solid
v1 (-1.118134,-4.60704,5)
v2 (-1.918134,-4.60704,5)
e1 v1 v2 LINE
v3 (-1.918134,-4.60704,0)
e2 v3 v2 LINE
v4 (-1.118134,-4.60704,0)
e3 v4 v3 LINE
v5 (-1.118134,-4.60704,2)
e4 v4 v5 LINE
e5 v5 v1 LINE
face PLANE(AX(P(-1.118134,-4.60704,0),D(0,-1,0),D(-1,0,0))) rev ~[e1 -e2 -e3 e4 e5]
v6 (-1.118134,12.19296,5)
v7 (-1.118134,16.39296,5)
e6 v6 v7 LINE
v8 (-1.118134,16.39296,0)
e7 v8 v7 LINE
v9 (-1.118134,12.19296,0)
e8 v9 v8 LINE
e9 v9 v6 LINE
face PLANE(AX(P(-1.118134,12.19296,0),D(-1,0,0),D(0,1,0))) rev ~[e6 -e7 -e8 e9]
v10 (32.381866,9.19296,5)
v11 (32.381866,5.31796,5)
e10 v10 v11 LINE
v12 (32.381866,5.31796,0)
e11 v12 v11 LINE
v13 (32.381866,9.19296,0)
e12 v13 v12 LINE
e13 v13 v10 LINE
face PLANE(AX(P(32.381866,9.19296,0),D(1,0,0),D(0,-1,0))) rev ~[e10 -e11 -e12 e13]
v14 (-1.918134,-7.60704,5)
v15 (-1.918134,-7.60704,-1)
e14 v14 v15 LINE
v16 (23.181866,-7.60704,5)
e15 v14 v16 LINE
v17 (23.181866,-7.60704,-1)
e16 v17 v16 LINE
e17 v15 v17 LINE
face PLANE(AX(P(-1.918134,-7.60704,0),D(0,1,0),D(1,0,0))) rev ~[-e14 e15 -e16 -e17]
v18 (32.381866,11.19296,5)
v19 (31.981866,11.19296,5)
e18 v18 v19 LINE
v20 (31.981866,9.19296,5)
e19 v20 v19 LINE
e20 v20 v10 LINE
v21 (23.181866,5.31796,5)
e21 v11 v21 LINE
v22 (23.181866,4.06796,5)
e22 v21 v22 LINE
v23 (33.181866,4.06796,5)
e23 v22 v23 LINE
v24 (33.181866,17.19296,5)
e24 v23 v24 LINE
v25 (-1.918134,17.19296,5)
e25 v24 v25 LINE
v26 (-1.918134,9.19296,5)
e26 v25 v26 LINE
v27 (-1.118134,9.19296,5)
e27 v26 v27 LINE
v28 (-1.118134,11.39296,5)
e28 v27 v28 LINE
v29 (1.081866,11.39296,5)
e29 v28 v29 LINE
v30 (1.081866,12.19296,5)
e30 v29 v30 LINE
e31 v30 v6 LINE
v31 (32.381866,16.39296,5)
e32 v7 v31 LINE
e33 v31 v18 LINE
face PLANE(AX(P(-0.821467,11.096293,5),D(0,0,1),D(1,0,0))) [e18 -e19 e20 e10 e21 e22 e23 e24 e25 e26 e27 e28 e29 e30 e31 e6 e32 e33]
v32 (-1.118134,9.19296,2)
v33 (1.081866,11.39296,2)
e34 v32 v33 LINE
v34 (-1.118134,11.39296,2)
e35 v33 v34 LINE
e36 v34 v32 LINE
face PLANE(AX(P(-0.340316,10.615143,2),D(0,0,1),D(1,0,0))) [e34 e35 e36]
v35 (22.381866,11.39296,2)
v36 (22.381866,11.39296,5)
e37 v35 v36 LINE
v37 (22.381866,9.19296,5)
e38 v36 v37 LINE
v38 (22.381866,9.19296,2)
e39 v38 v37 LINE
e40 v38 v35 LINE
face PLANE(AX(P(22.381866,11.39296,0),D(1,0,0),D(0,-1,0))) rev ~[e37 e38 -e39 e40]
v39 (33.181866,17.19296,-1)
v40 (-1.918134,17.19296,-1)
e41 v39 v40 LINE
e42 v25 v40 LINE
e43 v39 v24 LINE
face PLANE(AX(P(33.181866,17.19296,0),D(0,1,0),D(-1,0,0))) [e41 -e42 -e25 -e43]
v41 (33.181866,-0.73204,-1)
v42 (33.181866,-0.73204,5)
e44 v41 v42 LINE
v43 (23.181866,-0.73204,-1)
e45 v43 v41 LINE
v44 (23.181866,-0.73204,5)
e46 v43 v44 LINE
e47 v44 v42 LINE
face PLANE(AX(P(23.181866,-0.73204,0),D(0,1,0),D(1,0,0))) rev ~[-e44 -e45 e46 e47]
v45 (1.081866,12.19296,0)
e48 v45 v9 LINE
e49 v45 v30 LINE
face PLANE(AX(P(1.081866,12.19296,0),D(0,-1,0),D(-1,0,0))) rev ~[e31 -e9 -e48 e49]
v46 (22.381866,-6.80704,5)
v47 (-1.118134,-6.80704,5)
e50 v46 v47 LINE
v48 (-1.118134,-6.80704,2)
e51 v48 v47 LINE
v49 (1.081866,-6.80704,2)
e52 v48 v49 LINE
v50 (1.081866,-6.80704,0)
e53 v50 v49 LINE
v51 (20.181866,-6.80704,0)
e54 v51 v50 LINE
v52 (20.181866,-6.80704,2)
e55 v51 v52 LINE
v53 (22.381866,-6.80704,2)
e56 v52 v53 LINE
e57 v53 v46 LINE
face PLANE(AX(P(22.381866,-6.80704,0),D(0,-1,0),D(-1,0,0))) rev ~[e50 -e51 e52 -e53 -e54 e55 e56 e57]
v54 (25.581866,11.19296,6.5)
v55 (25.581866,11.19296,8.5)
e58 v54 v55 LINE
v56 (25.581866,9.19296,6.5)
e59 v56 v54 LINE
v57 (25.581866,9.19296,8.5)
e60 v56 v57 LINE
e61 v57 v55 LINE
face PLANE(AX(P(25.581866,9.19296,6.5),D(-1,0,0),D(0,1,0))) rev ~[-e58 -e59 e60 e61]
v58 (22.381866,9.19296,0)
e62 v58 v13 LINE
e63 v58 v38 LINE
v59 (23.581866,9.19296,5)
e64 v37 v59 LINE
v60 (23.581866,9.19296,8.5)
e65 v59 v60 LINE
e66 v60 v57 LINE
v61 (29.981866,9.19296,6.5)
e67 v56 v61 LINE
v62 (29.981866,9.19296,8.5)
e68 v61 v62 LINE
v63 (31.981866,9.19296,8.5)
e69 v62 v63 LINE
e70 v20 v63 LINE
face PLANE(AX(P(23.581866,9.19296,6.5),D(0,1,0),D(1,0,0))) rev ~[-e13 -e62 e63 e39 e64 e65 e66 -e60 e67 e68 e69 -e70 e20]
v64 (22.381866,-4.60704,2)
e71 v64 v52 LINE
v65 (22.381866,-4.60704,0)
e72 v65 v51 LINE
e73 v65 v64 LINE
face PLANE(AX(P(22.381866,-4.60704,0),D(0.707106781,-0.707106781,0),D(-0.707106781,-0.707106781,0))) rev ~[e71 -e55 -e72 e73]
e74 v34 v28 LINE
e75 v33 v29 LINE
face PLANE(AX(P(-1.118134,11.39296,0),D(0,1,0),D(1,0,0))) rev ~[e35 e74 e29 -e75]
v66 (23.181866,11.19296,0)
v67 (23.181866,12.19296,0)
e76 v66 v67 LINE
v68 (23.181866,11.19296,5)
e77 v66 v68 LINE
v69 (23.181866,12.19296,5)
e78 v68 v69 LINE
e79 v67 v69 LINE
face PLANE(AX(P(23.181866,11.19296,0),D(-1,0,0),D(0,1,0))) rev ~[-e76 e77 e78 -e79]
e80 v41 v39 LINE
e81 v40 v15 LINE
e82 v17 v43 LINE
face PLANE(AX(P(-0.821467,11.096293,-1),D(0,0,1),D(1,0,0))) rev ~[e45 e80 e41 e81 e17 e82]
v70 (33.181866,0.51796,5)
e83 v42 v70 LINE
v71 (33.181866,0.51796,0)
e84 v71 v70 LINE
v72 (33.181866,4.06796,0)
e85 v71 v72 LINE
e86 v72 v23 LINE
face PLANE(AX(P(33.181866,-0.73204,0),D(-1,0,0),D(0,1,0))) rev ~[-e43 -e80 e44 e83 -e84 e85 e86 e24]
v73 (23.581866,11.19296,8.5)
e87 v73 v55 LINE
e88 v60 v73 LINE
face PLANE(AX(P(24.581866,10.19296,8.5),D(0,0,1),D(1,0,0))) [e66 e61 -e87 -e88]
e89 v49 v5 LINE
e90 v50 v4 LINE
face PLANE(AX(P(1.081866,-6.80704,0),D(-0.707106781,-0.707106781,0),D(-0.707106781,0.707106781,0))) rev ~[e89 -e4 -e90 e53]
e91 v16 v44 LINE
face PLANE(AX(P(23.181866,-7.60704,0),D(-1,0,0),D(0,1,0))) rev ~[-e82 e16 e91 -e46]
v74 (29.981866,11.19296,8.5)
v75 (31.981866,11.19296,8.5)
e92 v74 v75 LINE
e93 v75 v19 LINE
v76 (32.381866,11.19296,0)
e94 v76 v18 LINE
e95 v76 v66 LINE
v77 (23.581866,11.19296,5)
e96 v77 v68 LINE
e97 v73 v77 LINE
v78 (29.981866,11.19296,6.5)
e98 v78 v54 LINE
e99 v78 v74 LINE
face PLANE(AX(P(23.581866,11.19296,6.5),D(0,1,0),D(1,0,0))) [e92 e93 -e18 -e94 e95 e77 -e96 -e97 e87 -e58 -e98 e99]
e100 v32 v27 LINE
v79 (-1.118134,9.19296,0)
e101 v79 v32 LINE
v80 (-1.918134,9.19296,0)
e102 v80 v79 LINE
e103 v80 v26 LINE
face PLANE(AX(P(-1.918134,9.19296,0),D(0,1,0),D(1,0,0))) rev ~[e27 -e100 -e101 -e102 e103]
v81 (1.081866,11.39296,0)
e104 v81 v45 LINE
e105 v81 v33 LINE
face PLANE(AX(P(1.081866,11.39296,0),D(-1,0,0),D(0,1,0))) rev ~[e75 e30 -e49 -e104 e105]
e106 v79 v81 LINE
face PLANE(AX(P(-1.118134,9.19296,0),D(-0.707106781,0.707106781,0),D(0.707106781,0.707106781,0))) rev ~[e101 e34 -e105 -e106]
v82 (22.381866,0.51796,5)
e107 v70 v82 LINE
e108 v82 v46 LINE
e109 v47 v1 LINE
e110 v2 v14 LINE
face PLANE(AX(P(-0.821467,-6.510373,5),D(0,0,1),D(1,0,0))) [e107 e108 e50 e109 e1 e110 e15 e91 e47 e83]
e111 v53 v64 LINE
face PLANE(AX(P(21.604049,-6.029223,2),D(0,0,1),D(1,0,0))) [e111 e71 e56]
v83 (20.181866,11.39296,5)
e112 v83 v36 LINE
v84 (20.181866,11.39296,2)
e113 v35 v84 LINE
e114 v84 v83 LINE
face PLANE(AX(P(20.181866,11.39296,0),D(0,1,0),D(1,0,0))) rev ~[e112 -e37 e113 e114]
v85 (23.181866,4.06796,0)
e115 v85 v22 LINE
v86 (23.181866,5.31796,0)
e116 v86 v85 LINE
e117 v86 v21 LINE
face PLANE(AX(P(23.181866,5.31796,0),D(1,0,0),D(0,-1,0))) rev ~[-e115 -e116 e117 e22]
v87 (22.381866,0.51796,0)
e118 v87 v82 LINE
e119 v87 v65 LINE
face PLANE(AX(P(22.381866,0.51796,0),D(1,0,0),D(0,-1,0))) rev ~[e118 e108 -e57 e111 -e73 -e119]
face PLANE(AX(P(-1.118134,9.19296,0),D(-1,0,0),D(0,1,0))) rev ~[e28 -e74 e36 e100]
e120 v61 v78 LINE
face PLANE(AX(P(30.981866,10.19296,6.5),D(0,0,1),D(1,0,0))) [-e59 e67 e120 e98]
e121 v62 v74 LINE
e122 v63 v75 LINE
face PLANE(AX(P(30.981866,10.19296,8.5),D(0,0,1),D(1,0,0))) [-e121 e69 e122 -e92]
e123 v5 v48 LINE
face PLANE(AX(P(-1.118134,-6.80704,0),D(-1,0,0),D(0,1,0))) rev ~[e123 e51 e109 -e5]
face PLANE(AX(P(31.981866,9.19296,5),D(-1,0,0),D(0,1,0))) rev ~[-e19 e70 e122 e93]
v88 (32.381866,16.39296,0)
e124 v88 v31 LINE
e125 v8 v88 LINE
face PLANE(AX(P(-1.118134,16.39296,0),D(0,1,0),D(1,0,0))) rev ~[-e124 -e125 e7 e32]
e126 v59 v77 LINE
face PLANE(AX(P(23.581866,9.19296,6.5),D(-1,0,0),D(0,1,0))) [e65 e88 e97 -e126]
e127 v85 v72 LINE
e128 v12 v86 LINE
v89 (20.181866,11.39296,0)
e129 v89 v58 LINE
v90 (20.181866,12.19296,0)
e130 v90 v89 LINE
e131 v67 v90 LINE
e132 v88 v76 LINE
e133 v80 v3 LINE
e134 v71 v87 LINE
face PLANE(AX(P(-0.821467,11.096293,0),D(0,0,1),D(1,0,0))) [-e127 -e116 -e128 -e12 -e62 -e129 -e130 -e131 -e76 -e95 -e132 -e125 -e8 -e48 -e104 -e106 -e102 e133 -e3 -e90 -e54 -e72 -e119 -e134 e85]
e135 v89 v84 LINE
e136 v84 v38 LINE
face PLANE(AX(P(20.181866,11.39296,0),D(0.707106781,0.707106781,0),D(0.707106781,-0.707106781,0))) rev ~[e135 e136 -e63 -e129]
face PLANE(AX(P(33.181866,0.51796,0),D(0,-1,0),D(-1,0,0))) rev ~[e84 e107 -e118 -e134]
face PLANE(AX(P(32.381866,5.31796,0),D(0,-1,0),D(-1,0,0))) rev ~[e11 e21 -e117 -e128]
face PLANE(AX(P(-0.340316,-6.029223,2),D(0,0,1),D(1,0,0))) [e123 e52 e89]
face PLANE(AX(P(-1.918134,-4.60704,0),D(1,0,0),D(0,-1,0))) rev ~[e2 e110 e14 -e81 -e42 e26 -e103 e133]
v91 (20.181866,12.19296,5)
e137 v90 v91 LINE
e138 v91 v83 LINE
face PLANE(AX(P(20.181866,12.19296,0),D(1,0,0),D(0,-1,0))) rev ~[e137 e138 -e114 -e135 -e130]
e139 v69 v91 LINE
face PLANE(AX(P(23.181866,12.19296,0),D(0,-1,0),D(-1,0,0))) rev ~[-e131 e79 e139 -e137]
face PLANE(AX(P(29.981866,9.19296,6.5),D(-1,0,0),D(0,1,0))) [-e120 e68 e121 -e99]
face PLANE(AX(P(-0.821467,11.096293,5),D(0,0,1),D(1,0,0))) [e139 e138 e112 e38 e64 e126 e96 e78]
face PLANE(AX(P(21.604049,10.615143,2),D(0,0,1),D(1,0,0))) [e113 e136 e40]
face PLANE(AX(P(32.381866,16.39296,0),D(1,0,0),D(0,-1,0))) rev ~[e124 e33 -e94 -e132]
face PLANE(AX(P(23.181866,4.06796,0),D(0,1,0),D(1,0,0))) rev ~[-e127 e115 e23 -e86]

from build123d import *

# Parameters (mm, degrees)
F0_W     = 19.1
F0_H     = 0.8
F0_W_2   = 0.8
F0_H_2   = 13.8
F0_W_3   = 2.45
F0_H_3   = 1
F0_H_4   = 2
F0_W_4   = 4.3
F0_H_5   = 3.875
F0_W_5   = 9.2
F0_H_6   = 3.55
F0_H_7   = 1.25
F1_DEPTH = 1
F2_DEPTH = 2
F3_DEPTH = 5
F4_W     = 2
F4_H     = 2
F4_W_2   = 4.4
F5_DEPTH = 1.5
F6_W     = 2
F6_H     = 2
F7_DEPTH = 2


# Not quite as in the source:
# - a feature names something its author has since deleted; it is built from what else it names


with BuildPart() as f1:
    # F0 (on Top) → F1 (new body)
    with BuildSketch(Plane.XY):
        Polygon((-1.9181339439, 9.1929600332), (-1.1181339439, 9.1929600332), (-1.1181339439, 11.3929600332), (1.0818660561, 11.3929600332), (1.0818660561, 12.1929600332), (-1.1181339439, 12.1929600332), (-1.9181339439, 12.1929600332), align=None)
        Polygon((-1.1181339439, 11.3929600332), (-1.1181339439, 9.1929600332), (1.0818660561, 11.3929600332), align=None)
        with Locations((10.6318660561, 11.7929600332)):
            Rectangle(F0_W, F0_H)
        Polygon((1.0818660561, -6.8070399668), (20.1818660561, -6.8070399668), (22.3818660561, -4.6070399668), (22.3818660561, 0.5179600332), (22.3818660561, 9.1929600332), (20.1818660561, 11.3929600332), (1.0818660561, 11.3929600332), (-1.1181339439, 9.1929600332), (-1.1181339439, -4.6070399668), align=None)
        with Locations((-1.5181339439, 2.2929600332)):
            Rectangle(F0_W_2, F0_H_2)
        Polygon((-1.9181339439, -7.6070399668), (1.0818660561, -7.6070399668), (1.0818660561, -6.8070399668), (-1.1181339439, -6.8070399668), (-1.1181339439, -4.6070399668), (-1.9181339439, -4.6070399668), (-1.9181339439, -6.8070399668), align=None)
        Polygon((-1.1181339439, -6.8070399668), (1.0818660561, -6.8070399668), (-1.1181339439, -4.6070399668), align=None)
        with Locations((10.6318660561, -7.2070399668)):
            Rectangle(F0_W, F0_H)
        Polygon((20.1818660561, -7.6070399668), (23.1818660561, -7.6070399668), (23.1818660561, -4.6070399668), (22.3818660561, -4.6070399668), (22.3818660561, -6.8070399668), (20.1818660561, -6.8070399668), align=None)
        Polygon((22.3818660561, -4.6070399668), (20.1818660561, -6.8070399668), (22.3818660561, -6.8070399668), align=None)
        Polygon((22.3818660561, 0.5179600332), (23.1818660561, 0.5179600332), (23.1818660561, 4.0679600332), (23.1818660561, 5.3179600332), (23.1818660561, 9.1929600332), (22.3818660561, 9.1929600332), align=None)
        Polygon((20.1818660561, 11.3929600332), (22.3818660561, 9.1929600332), (22.3818660561, 11.3929600332), align=None)
        Polygon((22.3818660561, 11.3929600332), (22.3818660561, 9.1929600332), (23.1818660561, 9.1929600332), (23.1818660561, 11.1929600332), (23.1818660561, 12.1929600332), (20.1818660561, 12.1929600332), (20.1818660561, 11.3929600332), align=None)
        with Locations((24.4068660561, 11.6929600332)):
            Rectangle(F0_W_3, F0_H_3)
        with Locations((24.4068660561, 10.1929600332)):
            Rectangle(F0_W_3, F0_H_4)
        with Locations((27.7818660561, 10.1929600332)):
            Rectangle(F0_W_4, F0_H_4)
        with Locations((27.7818660561, 11.6929600332)):
            Rectangle(F0_W_4, F0_H_3)
        with Locations((31.1568660561, 7.2554600332)):
            Rectangle(F0_W_3, F0_H_5)
        Polygon((32.3818660561, 9.1929600332), (32.3818660561, 5.3179600332), (33.1818660561, 5.3179600332), (33.1818660561, 12.1929600332), (32.3818660561, 12.1929600332), (32.3818660561, 11.1929600332), align=None)
        with Locations((27.7818660561, 7.2554600332)):
            Rectangle(F0_W_4, F0_H_5)
        with Locations((24.4068660561, 7.2554600332)):
            Rectangle(F0_W_3, F0_H_5)
        Polygon((23.1818660561, 5.3179600332), (23.1818660561, 4.0679600332), (32.3818660561, 4.0679600332), (32.3818660561, 5.3179600332), (29.9318660561, 5.3179600332), (25.6318660561, 5.3179600332), align=None)
        with Locations((27.7818660561, 2.2929600332)):
            Rectangle(F0_W_5, F0_H_6)
        with Locations((27.7818660561, -0.1070399668)):
            Rectangle(F0_W_5, F0_H_7)
        with Locations((32.7818660561, -0.1070399668)):
            Rectangle(F0_W_2, F0_H_7)
        with Locations((32.7818660561, 2.2929600332)):
            Rectangle(F0_W_2, F0_H_6)
        with Locations((32.7818660561, 4.6929600332)):
            Rectangle(F0_W_2, F0_H_7)
        Polygon((-1.9181339439, 17.1929600332), (-1.9181339439, 12.1929600332), (-1.1181339439, 12.1929600332), (-1.1181339439, 16.3929600332), (23.1818660561, 16.3929600332), (25.6318660561, 16.3929600332), (29.9318660561, 16.3929600332), (32.3818660561, 16.3929600332), (32.3818660561, 12.1929600332), (33.1818660561, 12.1929600332), (33.1818660561, 17.1929600332), (29.9318660561, 17.1929600332), (25.6318660561, 17.1929600332), (23.1818660561, 17.1929600332), align=None)
        Polygon((1.0818660561, 12.1929600332), (20.1818660561, 12.1929600332), (23.1818660561, 12.1929600332), (25.6318660561, 12.1929600332), (29.9318660561, 12.1929600332), (32.3818660561, 12.1929600332), (32.3818660561, 16.3929600332), (29.9318660561, 16.3929600332), (25.6318660561, 16.3929600332), (23.1818660561, 16.3929600332), (-1.1181339439, 16.3929600332), (-1.1181339439, 12.1929600332), align=None)
        Polygon((22.3818660561, -4.6070399668), (23.1818660561, -4.6070399668), (23.1818660561, -0.7320399668), (23.1818660561, 0.5179600332), (22.3818660561, 0.5179600332), align=None)
        with Locations((31.1568660561, 10.1929600332)):
            Rectangle(F0_W_3, F0_H_4)
        with Locations((31.1568660561, 11.6929600332)):
            Rectangle(F0_W_3, F0_H_3)
    extrude(amount=-F1_DEPTH)

    # F0 (on Top) → F2 (join)
    with BuildSketch(Plane.XY):
        Polygon((-1.1181339439, -6.8070399668), (1.0818660561, -6.8070399668), (-1.1181339439, -4.6070399668), align=None)
        Polygon((22.3818660561, -4.6070399668), (20.1818660561, -6.8070399668), (22.3818660561, -6.8070399668), align=None)
        Polygon((20.1818660561, 11.3929600332), (22.3818660561, 9.1929600332), (22.3818660561, 11.3929600332), align=None)
        Polygon((-1.1181339439, 11.3929600332), (-1.1181339439, 9.1929600332), (1.0818660561, 11.3929600332), align=None)
    extrude(amount=F2_DEPTH)

    # F0 (on Top) → F3 (join)
    with BuildSketch(Plane.XY):
        Polygon((-1.9181339439, -7.6070399668), (1.0818660561, -7.6070399668), (1.0818660561, -6.8070399668), (-1.1181339439, -6.8070399668), (-1.1181339439, -4.6070399668), (-1.9181339439, -4.6070399668), (-1.9181339439, -6.8070399668), align=None)
        Polygon((-1.9181339439, 9.1929600332), (-1.1181339439, 9.1929600332), (-1.1181339439, 11.3929600332), (1.0818660561, 11.3929600332), (1.0818660561, 12.1929600332), (-1.1181339439, 12.1929600332), (-1.9181339439, 12.1929600332), align=None)
        Polygon((20.1818660561, -7.6070399668), (23.1818660561, -7.6070399668), (23.1818660561, -4.6070399668), (22.3818660561, -4.6070399668), (22.3818660561, -6.8070399668), (20.1818660561, -6.8070399668), align=None)
        Polygon((22.3818660561, 11.3929600332), (22.3818660561, 9.1929600332), (23.1818660561, 9.1929600332), (23.1818660561, 11.1929600332), (23.1818660561, 12.1929600332), (20.1818660561, 12.1929600332), (20.1818660561, 11.3929600332), align=None)
        Polygon((-1.9181339439, 17.1929600332), (-1.9181339439, 12.1929600332), (-1.1181339439, 12.1929600332), (-1.1181339439, 16.3929600332), (23.1818660561, 16.3929600332), (25.6318660561, 16.3929600332), (29.9318660561, 16.3929600332), (32.3818660561, 16.3929600332), (32.3818660561, 12.1929600332), (33.1818660561, 12.1929600332), (33.1818660561, 17.1929600332), (29.9318660561, 17.1929600332), (25.6318660561, 17.1929600332), (23.1818660561, 17.1929600332), align=None)
        Polygon((32.3818660561, 9.1929600332), (32.3818660561, 5.3179600332), (33.1818660561, 5.3179600332), (33.1818660561, 12.1929600332), (32.3818660561, 12.1929600332), (32.3818660561, 11.1929600332), align=None)
        with Locations((32.7818660561, 4.6929600332)):
            Rectangle(F0_W_2, F0_H_7)
        with Locations((32.7818660561, -0.1070399668)):
            Rectangle(F0_W_2, F0_H_7)
        with Locations((27.7818660561, -0.1070399668)):
            Rectangle(F0_W_5, F0_H_7)
        Polygon((22.3818660561, -4.6070399668), (23.1818660561, -4.6070399668), (23.1818660561, -0.7320399668), (23.1818660561, 0.5179600332), (22.3818660561, 0.5179600332), align=None)
        with Locations((27.7818660561, 10.1929600332)):
            Rectangle(F0_W_4, F0_H_4)
        with Locations((24.4068660561, 10.1929600332)):
            Rectangle(F0_W_3, F0_H_4)
        with Locations((31.1568660561, 10.1929600332)):
            Rectangle(F0_W_3, F0_H_4)
        Polygon((23.1818660561, 5.3179600332), (23.1818660561, 4.0679600332), (32.3818660561, 4.0679600332), (32.3818660561, 5.3179600332), (29.9318660561, 5.3179600332), (25.6318660561, 5.3179600332), align=None)
        with Locations((10.6318660561, -7.2070399668)):
            Rectangle(F0_W, F0_H)
    extrude(amount=F3_DEPTH)

    # F4 (on face) → F5 (join)
    with BuildSketch(Plane.XY.offset(5)):
        with Locations((30.9818660561, 10.1929600332)):
            Rectangle(F4_W, F4_H)
        with Locations((24.5818660561, 10.1929600332)):
            Rectangle(F4_W, F4_H)
        with Locations((27.7818660561, 10.1929600332)):
            Rectangle(F4_W_2, F4_H)
    extrude(amount=F5_DEPTH)

    # F6 (on face) → F7 (join)
    with BuildSketch(Plane.XY.offset(6.5)):
        with Locations((24.5818660561, 10.1929600332)):
            Rectangle(F6_W, F6_H)
        with Locations((30.9818660561, 10.1929600332)):
            Rectangle(F6_W, F6_H)
    extrude(amount=F7_DEPTH)


solid = f1.part
